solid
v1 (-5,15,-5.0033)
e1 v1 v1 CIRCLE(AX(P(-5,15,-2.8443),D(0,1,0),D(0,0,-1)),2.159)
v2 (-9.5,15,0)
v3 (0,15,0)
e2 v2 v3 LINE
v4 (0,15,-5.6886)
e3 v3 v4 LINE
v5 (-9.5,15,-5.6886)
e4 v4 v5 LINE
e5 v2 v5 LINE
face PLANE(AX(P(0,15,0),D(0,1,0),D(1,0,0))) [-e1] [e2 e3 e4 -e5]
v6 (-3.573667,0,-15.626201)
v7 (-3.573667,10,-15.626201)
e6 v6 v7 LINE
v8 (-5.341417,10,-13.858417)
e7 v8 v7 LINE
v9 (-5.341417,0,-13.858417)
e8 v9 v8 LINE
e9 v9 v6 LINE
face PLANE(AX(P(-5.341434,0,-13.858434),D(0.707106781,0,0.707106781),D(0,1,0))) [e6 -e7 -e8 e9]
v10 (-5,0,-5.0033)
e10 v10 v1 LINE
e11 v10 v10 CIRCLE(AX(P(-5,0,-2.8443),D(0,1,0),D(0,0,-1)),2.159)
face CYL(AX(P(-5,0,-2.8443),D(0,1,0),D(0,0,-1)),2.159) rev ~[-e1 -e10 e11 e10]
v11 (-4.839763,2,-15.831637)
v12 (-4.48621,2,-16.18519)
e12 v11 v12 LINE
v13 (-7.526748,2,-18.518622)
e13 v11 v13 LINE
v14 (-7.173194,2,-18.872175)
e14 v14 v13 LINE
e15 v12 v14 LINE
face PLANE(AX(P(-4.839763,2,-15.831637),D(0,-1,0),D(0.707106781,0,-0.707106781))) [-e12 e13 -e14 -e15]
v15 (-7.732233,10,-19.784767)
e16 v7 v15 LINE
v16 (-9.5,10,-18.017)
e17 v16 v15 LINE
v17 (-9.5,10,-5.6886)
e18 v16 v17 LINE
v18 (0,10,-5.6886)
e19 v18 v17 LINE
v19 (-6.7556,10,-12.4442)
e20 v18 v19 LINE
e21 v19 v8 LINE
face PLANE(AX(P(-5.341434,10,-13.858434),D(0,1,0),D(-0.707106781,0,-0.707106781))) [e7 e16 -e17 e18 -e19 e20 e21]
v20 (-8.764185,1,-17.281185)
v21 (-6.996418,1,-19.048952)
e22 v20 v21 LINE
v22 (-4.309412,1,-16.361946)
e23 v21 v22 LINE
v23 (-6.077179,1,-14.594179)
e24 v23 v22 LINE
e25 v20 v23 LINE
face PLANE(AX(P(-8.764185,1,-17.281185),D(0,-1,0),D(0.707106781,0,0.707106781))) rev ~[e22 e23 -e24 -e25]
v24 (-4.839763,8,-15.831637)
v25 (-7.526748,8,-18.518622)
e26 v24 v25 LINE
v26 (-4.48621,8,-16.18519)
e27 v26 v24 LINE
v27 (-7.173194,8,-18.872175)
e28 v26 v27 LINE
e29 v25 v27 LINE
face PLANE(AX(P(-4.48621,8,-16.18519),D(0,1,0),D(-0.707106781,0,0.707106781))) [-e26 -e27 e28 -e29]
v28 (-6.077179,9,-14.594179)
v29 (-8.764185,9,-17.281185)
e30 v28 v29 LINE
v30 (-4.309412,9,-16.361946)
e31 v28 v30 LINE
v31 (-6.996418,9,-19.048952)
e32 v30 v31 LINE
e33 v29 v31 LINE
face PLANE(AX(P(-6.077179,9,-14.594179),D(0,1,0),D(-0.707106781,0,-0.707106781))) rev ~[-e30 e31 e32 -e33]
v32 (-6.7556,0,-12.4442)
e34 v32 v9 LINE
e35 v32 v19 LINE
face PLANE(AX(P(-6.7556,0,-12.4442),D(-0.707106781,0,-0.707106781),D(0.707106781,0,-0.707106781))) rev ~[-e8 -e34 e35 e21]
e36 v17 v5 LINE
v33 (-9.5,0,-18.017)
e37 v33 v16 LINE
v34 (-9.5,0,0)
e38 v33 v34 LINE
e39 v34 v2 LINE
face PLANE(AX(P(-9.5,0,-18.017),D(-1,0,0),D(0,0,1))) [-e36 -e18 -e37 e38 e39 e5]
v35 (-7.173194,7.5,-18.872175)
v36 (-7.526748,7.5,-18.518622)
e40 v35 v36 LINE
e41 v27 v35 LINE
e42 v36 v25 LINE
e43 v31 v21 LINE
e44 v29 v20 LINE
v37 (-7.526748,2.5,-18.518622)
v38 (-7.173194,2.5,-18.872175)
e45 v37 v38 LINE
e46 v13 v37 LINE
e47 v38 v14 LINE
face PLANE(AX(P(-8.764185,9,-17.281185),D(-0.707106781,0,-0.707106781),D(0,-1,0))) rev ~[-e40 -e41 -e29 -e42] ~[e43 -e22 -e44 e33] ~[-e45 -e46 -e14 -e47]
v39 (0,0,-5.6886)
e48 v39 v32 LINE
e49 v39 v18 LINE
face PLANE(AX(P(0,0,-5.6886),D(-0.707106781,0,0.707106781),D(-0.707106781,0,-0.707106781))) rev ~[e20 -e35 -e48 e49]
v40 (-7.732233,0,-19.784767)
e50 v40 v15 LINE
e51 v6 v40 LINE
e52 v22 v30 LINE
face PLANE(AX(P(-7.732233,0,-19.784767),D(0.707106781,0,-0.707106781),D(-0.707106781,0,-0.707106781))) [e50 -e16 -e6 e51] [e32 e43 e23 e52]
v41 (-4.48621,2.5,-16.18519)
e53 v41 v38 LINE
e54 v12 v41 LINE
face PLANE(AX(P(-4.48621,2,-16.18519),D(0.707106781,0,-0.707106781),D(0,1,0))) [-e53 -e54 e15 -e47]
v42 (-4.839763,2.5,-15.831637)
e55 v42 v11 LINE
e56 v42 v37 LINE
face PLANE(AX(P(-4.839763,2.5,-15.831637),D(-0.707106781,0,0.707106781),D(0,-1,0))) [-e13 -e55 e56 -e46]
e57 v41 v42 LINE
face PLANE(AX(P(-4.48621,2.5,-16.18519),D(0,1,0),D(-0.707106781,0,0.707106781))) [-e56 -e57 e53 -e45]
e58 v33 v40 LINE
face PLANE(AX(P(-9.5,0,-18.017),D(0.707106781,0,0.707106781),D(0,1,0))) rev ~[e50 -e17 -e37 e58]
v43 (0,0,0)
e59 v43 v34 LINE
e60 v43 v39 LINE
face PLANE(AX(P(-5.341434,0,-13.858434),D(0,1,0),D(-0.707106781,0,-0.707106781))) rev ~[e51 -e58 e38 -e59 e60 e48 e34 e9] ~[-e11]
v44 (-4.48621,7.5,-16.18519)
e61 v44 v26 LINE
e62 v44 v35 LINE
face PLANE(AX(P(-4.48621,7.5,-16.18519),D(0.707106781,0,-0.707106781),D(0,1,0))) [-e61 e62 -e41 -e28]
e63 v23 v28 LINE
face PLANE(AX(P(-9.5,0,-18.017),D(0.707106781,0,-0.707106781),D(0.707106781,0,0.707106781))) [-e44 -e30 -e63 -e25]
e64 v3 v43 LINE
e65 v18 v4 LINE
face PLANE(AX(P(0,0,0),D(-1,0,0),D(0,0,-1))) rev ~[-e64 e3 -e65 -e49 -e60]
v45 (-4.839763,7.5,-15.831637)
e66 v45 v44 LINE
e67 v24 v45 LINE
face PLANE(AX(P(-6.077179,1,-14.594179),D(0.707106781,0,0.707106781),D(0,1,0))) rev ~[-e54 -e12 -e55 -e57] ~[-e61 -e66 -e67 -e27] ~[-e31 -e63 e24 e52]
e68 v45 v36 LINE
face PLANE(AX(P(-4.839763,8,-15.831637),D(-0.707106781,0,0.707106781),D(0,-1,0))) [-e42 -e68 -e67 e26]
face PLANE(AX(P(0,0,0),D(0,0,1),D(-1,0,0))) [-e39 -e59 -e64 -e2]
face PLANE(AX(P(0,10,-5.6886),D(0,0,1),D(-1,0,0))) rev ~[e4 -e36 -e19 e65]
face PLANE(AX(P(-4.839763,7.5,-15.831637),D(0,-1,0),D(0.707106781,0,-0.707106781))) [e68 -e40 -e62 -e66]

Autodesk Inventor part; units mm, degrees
ref_plane "YZ Plane" through (0, 0, 0) normal (1, 0, 0) x (0, 1, 0)
ref_plane "XZ Plane" through (0, 0, 0) normal (0, 1, 0) x (-1, 0, 0)
ref_plane "XY Plane" through (0, 0, 0) normal (0, 0, 1) x (1, 0, 0)
sketch "Sketch1" plane through (0, 0, 0) normal (0, 1, 0) x (-1, 0, 0)
  line L0 (0, -5.6886) -> (6.7556, -12.4442)
  line L1 (6.7556, -12.4442) -> (5.3414, -13.8584)
  line L2 (9.5, -18.017) -> (5.3414, -13.8584)
  line L3 (10, -18.017) -> (9.5, -18.017)
  line L4 (10, -18.017) -> (10, 0)
  line L5 (0, 0) -> (10, 0)
  line L6 (0, 0) -> (0, -5.6886)
  circle A0 centre (5, -2.8443) radius 1.339
extrude "Extrusion1" add sketch "Sketch1" along normal blind 10
sketch "Sketch2" plane through (0, 10, 0) normal (0, 1, 0) x (1, 0, 0)
  line L0 (0, 5.6886) -> (-10, 5.6886)
  line L1 (-10, 5.6886) -> (-10, 0)
  line L2 (-10, 0) -> (0, 0)
  line L3 (0, 0) -> (0, 5.6886)
extrude "Extrusion2" add sketch "Sketch2" along normal blind 20
sketch "Sketch3" plane through (0, 0, 0) normal (0, -1, 0) x (1, 0, 0)
  circle A0 centre (-5, -2.8443) radius 1.339 projected
hole "Hole1" at (-5, 0, -2.8443) direction (0, 1, 0) diameter 4.318 end through all
sketch "Sketch8" plane through (-9.5, 0, -18.017) normal (0.7071068, 0, -0.7071068) x (-0.7071068, 0, -0.7071068)
  line L0 (-5.8811, 0) -> (0, 0) projected
  line L1 (0, 0) -> (0, 10) projected
  line L2 (-5.8811, 10) -> (0, 10) projected
  line L3 (-5.8811, 0) -> (-5.8811, 10) projected
  line L4 (-1.0406, 1) -> (-4.8406, 1)
  line L5 (-4.8406, 1) -> (-4.8406, 9)
  line L6 (-4.8406, 9) -> (-1.0406, 9)
  line L7 (-1.0406, 9) -> (-1.0406, 1)
  line L8 (-1.0406, 1) -> (-4.8406, 9) construction
  line L9 (-4.8406, 1) -> (-1.0406, 9) construction
  point P0 (-19.4575, 0)
  point P1 (-2.9406, 5)
  dimension "d41" = 3.8
  dimension "d42" = 8
extrude "Extrusion6" add sketch "Sketch8" along normal blind 2.5
sketch "Sketch9" plane through (-6.0772, 1, -14.5942) normal (-0.7071068, 0, -0.7071068) x (-0.7071068, 0, 0.7071068)
  line L0 (-2.25, 7) -> (-1.75, 7)
  line L1 (-1.75, 7) -> (-1.75, 6.5)
  line L2 (-1.75, 6.5) -> (-2.25, 6.5)
  line L3 (-2.25, 6.5) -> (-2.25, 7)
  line L4 (-1.75, 1) -> (-2.25, 1)
  line L5 (-2.25, 1) -> (-2.25, 1.5)
  line L6 (-2.25, 1.5) -> (-1.75, 1.5)
  line L7 (-1.75, 1.5) -> (-1.75, 1)
  point P0 (6.0224, -1)
  dimension "d45" = 0.5
  dimension "d46" = 0.5
  dimension "d47" = 0.5
  dimension "d48" = 0.5
extrude "Extrusion7" add sketch "Sketch9" along normal blind 4
sketch "Sketch10" plane through (0, 30, 0) normal (0, 1, 0) x (1, 0, 0)
  circle A0 centre (-5, 2.8443) radius 2.159 projected
  line L0 (0, 5.6886) -> (-10, 5.6886) projected
  line L1 (-10, 5.6886) -> (-10, 0) projected
  line L2 (-10, 0) -> (0, 0) projected
  line L3 (0, 0) -> (0, 5.6886) projected
extrude "Extrusion8" cut sketch "Sketch10" against normal blind 15
sketch "Sketch11" plane through (-10, 0, -18.017) normal (-1, 0, 0) x (0, 0, 1)
  line L0 (18.017, 15) -> (12.3284, 15) projected
  line L1 (12.3284, 10) -> (12.3284, 15) projected
  line L2 (0, 10) -> (12.3284, 10) projected
  line L3 (0, 0) -> (0, 10) projected
  line L4 (0, 0) -> (18.017, 0) projected
  line L5 (18.017, 0) -> (18.017, 15) projected
extrude "Extrusion9" cut sketch "Sketch11" against normal blind 0.5
properties part number "TensionMountV2"
